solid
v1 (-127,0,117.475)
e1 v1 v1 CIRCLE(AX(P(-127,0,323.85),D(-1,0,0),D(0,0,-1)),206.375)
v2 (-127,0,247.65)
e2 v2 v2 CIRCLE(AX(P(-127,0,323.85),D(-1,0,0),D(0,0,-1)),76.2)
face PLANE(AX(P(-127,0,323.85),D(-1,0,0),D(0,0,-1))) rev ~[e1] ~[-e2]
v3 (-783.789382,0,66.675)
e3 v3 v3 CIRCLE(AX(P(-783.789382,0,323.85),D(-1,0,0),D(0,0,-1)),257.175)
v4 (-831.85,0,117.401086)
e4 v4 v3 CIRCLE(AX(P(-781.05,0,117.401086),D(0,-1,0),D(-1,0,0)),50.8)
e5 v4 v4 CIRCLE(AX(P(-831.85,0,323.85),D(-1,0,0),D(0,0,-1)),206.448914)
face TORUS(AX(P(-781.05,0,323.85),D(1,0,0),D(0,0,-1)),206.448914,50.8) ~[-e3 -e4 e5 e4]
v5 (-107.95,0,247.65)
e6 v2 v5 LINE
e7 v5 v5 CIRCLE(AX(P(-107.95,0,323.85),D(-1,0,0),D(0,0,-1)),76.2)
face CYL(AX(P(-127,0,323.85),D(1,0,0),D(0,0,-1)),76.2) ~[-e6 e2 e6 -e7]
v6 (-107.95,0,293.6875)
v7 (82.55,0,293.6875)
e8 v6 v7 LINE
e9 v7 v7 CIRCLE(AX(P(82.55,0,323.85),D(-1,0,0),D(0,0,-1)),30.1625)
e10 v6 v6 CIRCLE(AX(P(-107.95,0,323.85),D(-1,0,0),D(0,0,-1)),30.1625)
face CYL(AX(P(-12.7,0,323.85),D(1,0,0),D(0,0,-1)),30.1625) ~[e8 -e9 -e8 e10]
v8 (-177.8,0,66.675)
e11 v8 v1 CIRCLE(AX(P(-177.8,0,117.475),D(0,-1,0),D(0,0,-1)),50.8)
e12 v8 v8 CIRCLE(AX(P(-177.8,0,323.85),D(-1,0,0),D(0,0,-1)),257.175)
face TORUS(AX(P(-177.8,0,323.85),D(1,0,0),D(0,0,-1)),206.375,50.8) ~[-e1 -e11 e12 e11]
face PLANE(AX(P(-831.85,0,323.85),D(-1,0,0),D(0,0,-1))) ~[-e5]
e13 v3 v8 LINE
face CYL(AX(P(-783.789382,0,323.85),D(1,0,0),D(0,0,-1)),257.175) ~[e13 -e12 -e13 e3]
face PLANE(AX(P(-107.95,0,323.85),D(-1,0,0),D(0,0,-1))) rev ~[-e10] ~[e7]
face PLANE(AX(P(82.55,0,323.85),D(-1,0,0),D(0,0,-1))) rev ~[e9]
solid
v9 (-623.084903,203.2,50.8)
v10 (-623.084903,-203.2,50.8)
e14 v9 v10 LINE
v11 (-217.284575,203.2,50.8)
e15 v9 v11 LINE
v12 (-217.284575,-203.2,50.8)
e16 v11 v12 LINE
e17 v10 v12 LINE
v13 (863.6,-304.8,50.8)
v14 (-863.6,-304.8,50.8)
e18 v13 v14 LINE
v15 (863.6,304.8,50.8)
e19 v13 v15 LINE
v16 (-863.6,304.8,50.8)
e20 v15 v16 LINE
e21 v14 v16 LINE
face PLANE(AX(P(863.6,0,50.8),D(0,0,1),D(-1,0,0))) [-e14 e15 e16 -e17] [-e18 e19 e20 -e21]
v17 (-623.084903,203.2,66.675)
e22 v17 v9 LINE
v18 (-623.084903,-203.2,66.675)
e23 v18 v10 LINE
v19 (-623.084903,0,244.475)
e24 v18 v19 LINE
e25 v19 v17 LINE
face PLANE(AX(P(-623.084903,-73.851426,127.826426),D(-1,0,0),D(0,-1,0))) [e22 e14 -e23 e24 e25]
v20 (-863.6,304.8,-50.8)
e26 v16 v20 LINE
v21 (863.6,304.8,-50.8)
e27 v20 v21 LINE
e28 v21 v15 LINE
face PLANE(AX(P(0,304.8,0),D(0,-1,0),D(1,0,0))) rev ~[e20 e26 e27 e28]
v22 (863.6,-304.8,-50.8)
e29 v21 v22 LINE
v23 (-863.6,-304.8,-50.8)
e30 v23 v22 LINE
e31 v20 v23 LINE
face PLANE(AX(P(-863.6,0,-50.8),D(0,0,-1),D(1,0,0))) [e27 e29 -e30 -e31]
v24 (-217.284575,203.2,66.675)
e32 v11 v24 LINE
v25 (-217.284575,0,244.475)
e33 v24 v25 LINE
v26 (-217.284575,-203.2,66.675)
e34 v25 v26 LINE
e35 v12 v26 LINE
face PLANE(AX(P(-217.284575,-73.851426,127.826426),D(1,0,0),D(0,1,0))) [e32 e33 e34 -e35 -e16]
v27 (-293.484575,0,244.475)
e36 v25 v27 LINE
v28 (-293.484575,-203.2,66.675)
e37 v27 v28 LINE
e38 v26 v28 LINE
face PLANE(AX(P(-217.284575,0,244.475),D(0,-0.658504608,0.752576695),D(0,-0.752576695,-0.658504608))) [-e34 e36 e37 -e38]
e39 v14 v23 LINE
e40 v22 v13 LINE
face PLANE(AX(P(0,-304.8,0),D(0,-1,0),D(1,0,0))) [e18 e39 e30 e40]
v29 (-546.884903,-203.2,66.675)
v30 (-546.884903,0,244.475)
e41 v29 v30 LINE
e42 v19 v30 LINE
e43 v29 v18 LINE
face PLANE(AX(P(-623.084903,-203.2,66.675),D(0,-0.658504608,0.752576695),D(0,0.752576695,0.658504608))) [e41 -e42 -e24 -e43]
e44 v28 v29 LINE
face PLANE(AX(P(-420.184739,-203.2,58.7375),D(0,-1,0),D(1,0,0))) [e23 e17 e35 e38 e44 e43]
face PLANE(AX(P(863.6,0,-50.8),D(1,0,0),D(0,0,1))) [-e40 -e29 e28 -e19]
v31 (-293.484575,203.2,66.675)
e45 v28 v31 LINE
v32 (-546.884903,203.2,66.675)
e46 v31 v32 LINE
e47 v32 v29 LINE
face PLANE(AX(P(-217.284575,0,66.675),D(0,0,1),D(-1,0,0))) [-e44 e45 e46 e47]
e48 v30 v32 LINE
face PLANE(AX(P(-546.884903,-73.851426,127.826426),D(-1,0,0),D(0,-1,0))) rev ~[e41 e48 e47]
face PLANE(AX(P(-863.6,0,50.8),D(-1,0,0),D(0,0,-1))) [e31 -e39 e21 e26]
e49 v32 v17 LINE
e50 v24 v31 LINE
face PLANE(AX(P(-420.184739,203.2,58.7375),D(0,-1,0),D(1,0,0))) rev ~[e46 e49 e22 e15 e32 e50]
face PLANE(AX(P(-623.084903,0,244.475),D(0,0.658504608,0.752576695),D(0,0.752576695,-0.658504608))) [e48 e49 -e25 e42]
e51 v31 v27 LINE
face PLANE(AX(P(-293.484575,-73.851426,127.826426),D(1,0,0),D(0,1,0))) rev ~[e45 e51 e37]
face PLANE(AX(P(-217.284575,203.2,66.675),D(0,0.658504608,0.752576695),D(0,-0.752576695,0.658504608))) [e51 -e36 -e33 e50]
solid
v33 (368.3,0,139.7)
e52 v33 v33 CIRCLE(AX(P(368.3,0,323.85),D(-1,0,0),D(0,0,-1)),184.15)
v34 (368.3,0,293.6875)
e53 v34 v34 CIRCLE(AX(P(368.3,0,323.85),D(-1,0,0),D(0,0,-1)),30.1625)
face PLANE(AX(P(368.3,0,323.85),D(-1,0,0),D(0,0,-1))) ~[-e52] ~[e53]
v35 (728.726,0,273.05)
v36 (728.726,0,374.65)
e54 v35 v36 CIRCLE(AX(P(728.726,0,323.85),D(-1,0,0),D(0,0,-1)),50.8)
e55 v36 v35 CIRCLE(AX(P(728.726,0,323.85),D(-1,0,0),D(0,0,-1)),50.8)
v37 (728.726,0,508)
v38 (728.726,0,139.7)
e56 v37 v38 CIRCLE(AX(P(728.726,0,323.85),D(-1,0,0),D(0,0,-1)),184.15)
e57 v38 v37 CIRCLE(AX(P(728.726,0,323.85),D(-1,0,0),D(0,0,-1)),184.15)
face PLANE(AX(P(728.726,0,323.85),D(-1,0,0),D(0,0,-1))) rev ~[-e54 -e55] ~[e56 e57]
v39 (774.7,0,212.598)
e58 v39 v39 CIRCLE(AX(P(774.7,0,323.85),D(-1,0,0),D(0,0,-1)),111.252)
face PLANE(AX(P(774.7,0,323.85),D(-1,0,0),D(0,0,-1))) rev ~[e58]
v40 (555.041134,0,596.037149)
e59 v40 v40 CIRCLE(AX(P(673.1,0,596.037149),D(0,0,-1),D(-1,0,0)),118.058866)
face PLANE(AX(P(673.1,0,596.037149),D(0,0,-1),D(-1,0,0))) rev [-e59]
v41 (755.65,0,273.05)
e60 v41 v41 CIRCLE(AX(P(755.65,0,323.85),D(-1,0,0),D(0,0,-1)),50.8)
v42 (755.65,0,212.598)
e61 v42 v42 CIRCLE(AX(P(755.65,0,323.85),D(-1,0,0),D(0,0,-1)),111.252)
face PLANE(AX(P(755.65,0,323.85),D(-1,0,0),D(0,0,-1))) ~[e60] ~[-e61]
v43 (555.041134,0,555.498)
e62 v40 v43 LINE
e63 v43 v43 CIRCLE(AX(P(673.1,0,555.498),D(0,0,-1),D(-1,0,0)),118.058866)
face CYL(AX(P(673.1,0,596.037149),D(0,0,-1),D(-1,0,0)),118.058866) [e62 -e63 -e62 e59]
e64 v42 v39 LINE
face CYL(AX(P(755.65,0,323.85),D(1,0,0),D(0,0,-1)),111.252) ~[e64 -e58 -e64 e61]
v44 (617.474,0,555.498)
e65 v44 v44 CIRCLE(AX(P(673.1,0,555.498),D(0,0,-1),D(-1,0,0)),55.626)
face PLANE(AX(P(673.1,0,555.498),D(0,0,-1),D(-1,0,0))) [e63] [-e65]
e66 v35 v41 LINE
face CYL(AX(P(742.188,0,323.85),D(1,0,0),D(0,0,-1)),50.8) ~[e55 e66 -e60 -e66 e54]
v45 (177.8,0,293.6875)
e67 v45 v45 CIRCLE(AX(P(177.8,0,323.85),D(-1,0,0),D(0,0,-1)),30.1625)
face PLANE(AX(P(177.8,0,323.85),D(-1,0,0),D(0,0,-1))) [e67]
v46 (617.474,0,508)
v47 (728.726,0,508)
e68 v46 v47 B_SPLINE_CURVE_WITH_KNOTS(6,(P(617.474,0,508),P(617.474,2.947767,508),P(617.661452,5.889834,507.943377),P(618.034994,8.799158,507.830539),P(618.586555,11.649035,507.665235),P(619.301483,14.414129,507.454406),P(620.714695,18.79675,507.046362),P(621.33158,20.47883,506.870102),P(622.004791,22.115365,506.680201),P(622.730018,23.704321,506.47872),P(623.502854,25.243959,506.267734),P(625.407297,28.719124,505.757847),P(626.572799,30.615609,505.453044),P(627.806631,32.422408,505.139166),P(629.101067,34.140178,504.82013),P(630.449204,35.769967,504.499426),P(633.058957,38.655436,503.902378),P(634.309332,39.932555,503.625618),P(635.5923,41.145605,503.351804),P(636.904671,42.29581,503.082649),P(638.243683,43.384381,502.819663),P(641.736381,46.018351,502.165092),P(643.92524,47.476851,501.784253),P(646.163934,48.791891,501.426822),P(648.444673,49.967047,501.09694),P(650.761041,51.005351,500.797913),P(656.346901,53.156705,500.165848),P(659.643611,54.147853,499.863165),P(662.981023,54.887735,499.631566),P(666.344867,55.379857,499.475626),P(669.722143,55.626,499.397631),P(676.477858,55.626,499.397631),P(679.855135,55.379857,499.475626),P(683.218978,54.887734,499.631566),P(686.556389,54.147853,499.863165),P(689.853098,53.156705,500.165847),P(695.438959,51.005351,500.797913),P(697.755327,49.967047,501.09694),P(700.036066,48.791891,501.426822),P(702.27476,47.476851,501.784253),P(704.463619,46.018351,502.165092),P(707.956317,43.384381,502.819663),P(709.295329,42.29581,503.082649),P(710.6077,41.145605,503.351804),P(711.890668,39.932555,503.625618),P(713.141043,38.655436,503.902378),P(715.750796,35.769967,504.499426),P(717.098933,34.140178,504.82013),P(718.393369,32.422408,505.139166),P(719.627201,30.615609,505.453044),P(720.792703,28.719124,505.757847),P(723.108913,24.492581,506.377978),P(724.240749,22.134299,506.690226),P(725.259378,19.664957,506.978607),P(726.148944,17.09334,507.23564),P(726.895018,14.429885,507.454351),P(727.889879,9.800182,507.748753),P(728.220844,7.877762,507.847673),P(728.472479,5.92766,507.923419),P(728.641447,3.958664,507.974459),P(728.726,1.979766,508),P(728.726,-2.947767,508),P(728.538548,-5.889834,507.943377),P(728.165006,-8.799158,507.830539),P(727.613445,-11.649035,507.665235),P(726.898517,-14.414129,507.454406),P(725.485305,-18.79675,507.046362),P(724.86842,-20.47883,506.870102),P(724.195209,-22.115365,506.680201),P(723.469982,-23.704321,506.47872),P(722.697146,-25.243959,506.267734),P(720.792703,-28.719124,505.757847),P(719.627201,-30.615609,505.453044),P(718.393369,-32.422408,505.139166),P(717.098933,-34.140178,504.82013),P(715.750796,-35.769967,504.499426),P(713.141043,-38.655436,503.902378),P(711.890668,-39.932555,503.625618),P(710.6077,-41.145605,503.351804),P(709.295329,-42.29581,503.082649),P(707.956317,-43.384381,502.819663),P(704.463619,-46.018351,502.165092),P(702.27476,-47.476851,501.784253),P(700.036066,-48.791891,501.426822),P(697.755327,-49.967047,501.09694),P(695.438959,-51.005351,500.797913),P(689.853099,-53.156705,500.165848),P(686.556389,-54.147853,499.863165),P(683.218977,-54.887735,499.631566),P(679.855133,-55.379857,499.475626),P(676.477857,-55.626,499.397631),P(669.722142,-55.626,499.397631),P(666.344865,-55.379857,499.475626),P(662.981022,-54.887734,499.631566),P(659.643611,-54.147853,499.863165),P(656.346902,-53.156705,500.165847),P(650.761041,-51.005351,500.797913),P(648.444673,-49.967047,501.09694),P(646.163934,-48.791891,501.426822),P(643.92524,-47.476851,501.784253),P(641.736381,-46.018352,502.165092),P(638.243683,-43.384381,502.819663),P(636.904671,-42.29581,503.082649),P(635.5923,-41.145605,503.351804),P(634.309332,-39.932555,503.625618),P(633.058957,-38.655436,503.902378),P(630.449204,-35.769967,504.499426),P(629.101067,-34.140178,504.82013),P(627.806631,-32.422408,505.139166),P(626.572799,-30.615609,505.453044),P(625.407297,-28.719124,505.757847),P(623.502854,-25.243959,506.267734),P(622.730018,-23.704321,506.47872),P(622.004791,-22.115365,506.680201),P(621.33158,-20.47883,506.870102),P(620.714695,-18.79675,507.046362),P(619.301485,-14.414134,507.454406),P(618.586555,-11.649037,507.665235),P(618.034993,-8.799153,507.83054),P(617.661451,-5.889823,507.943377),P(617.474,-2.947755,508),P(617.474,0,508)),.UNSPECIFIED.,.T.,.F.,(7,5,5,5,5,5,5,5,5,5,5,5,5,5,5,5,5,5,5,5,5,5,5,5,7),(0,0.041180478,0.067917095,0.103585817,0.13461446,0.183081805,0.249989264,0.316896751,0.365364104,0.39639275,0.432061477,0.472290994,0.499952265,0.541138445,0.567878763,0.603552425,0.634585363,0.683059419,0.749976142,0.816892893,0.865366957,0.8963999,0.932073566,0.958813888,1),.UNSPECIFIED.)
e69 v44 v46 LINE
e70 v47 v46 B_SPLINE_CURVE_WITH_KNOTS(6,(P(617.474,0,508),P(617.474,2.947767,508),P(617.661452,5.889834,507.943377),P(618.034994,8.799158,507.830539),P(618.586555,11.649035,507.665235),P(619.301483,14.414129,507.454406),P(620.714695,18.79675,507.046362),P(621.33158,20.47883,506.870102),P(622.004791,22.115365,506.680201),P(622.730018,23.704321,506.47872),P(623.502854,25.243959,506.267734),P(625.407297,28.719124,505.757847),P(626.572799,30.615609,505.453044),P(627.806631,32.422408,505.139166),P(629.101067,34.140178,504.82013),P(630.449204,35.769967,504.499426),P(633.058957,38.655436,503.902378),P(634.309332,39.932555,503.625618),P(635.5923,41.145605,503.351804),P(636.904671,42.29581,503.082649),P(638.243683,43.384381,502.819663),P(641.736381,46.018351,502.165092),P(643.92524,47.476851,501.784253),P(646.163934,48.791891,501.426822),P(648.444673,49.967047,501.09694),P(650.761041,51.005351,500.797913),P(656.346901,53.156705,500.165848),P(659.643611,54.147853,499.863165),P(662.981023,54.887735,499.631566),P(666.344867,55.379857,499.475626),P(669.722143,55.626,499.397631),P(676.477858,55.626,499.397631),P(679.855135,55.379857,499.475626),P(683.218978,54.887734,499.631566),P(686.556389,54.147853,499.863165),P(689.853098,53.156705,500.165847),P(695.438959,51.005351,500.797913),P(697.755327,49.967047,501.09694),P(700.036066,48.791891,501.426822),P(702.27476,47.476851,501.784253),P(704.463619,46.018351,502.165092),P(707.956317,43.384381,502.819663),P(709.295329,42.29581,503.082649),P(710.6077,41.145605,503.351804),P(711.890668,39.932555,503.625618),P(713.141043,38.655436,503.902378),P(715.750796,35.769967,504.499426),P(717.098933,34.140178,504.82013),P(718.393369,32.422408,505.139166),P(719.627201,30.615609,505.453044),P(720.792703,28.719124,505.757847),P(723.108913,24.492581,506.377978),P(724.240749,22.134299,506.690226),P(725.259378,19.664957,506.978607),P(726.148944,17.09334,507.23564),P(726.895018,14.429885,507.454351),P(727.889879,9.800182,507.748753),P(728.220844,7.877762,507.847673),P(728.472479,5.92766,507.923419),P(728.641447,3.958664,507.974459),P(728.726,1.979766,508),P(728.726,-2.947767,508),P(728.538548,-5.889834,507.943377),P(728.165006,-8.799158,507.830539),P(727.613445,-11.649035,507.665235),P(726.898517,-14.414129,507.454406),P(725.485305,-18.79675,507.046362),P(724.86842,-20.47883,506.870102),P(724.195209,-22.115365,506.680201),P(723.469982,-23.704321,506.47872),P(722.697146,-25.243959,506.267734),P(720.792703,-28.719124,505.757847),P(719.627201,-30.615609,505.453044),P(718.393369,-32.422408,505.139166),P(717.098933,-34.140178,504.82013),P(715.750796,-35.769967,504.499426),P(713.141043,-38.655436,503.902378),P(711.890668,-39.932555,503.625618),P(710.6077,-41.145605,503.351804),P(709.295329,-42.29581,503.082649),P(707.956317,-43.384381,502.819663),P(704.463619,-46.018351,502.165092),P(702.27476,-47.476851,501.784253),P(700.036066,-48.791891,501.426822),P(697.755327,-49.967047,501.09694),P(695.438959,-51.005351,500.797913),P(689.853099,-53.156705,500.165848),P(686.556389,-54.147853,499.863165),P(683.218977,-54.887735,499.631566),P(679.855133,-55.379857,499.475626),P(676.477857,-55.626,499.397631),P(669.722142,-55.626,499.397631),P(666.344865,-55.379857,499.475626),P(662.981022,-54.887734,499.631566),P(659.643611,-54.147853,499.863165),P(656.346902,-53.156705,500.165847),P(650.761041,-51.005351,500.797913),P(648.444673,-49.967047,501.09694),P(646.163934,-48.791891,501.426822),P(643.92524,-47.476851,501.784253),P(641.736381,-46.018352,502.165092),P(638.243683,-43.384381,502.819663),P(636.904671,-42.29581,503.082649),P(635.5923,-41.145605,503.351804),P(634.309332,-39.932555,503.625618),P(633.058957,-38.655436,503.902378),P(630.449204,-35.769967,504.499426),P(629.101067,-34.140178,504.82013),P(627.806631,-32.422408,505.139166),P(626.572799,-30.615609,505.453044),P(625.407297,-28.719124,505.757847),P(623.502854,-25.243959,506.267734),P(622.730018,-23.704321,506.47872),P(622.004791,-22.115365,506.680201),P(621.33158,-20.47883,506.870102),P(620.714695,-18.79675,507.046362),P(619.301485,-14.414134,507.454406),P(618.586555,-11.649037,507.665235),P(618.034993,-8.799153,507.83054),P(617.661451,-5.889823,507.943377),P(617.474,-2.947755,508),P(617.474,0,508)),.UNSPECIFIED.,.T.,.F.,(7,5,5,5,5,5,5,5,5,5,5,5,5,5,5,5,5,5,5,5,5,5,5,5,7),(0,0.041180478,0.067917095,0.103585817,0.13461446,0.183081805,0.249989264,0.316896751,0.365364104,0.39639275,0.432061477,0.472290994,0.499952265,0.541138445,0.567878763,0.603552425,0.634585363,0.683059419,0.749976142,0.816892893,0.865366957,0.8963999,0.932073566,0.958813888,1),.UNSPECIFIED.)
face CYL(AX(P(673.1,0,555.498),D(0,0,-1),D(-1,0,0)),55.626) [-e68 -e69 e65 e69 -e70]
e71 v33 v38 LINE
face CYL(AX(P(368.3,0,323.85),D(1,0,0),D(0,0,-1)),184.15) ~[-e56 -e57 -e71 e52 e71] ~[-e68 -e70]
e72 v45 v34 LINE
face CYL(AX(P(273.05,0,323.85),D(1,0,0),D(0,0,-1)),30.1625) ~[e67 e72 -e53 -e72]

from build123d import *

# Parameters (mm, degrees)
F0_W     = 190.5
F0_H     = 30.1625
F2_DEPTH = 203.2
F4_DEPTH = 76.2
F6_DEPTH = 76.2
F7_DEPTH = 304.8
F0_W_2   = 26.924
F0_H_2   = 50.8
F0_W_3   = 55.626
F0_H_3   = 47.498
F0_H_4   = 184.15


with BuildPart() as f1:
    # F0 (on Front) → F1 (revolve)
    with BuildSketch(Plane.XZ):
        with BuildLine():
            ThreePointArc((-831.85, 117.4010858536), (-817.9268261091, 82.4620003458), (-783.7893820427, 66.675))
            Line((-783.7893820427, 66.675), (-623.0849027634, 66.675))
            Line((-623.0849027634, 66.675), (-234.2933673859, 66.675))
            Line((-234.2933673859, 66.675), (-234.2933673859, 323.85))
            Line((-234.2933673859, 323.85), (-831.85, 323.85))
            Line((-831.85, 323.85), (-831.85, 117.4010858536))
        make_face()
        with BuildLine():
            Line((-234.2933673859, 323.85), (-234.2933673859, 66.675))
            Line((-234.2933673859, 66.675), (-217.2845751047, 66.675))
            Line((-217.2845751047, 66.675), (-177.8, 66.675))
            ThreePointArc((-177.8, 66.675), (-141.8789755157, 81.5539755157), (-127, 117.475))
            Line((-127, 117.475), (-127, 247.65))
            Line((-127, 247.65), (-127, 323.85))
            Line((-127, 323.85), (-234.2933673859, 323.85))
        make_face()
        Polygon((-107.95, 323.85), (-127, 323.85), (-127, 247.65), (-107.95, 247.65), (-107.95, 293.6875), align=None)
        with Locations((-12.7, 308.76875)):
            Rectangle(F0_W, F0_H)
    revolve(axis=Axis((-374.65, 0, 323.85), (-1, 0, 0)))


with BuildPart() as f2:
    # F0 (on Front) → F2 (new body, symmetric)
    with BuildSketch(Plane.XZ):
        Polygon((-623.0849027634, 66.675), (-623.0849027634, 50.8), (-533.4, 50.8), (-217.2845751047, 50.8), (-217.2845751047, 66.675), (-234.2933673859, 66.675), align=None)
    extrude(amount=F2_DEPTH, both=True)

    # F3 (on face) → F4 (join)
    with BuildSketch(Plane(origin=(-623.0849027634, 0, 0), x_dir=(0, -1, 0), z_dir=(-1, 0, 0))):
        Polygon((0, 244.475), (0, 66.675), (203.2, 66.675), align=None)
        Polygon((-203.2, 66.675), (0, 66.675), (0, 244.475), align=None)
    extrude(amount=-F4_DEPTH)

    # F5 (on face) → F6 (join)
    with BuildSketch(Plane.YZ.offset(-217.2845751047)):
        Polygon((-203.2, 66.675), (0, 66.675), (0, 244.475), align=None)
        Polygon((0, 244.475), (0, 66.675), (203.2, 66.675), align=None)
    extrude(amount=-F6_DEPTH)

    # F0 (on Front) → F7 (join, symmetric)
    with BuildSketch(Plane.XZ):
        Polygon((-863.6, 50.8), (-863.6, -50.8), (863.6, -50.8), (863.6, 50.8), (705.2845358849, 50.8), (588.1003141403, 50.8), (455.1412463188, 50.8), (368.3, 50.8), (-127, 50.8), (-217.2845751047, 50.8), (-533.4, 50.8), (-623.0849027634, 50.8), (-736.6, 50.8), (-831.85, 50.8), align=None)
    extrude(amount=F7_DEPTH, both=True)


with BuildPart() as f8:
    # F0 (on Front) → F8 (revolve)
    with BuildSketch(Plane.XZ):
        with Locations((273.05, 308.76875)):
            Rectangle(F0_W, F0_H)
        Polygon((615.1428222656, 139.7), (689.5097494125, 139.7), (728.726, 139.7), (728.726, 273.05), (728.726, 323.85), (673.1, 323.85), (617.474, 323.85), (368.3, 323.85), (368.3, 293.6875), (368.3, 139.7), (394.2955732346, 139.7), (455.1412463188, 139.7), align=None)
        with Locations((742.188, 298.45)):
            Rectangle(F0_W_2, F0_H_2)
        Polygon((755.65, 323.85), (755.65, 273.05), (755.65, 212.598), (774.7, 212.598), (774.7, 323.85), align=None)
    revolve(axis=Axis((476.25, 0, 323.85), (-1, 0, 0)))

    # F0 (on Front) → F9 (revolve)
    with BuildSketch(Plane.XZ):
        Polygon((617.474, 555.498), (673.1, 555.498), (673.1, 596.0371494293), (555.0411343575, 596.0371494293), (555.0411343575, 555.498), align=None)
        with Locations((645.287, 531.749)):
            Rectangle(F0_W_3, F0_H_3)
        with Locations((645.287, 415.925)):
            Rectangle(F0_W_3, F0_H_4)
    revolve(axis=Axis((673.1, 0, 439.674), (0, 0, -1)))


solid = Compound([f1.part, f2.part, f8.part])
